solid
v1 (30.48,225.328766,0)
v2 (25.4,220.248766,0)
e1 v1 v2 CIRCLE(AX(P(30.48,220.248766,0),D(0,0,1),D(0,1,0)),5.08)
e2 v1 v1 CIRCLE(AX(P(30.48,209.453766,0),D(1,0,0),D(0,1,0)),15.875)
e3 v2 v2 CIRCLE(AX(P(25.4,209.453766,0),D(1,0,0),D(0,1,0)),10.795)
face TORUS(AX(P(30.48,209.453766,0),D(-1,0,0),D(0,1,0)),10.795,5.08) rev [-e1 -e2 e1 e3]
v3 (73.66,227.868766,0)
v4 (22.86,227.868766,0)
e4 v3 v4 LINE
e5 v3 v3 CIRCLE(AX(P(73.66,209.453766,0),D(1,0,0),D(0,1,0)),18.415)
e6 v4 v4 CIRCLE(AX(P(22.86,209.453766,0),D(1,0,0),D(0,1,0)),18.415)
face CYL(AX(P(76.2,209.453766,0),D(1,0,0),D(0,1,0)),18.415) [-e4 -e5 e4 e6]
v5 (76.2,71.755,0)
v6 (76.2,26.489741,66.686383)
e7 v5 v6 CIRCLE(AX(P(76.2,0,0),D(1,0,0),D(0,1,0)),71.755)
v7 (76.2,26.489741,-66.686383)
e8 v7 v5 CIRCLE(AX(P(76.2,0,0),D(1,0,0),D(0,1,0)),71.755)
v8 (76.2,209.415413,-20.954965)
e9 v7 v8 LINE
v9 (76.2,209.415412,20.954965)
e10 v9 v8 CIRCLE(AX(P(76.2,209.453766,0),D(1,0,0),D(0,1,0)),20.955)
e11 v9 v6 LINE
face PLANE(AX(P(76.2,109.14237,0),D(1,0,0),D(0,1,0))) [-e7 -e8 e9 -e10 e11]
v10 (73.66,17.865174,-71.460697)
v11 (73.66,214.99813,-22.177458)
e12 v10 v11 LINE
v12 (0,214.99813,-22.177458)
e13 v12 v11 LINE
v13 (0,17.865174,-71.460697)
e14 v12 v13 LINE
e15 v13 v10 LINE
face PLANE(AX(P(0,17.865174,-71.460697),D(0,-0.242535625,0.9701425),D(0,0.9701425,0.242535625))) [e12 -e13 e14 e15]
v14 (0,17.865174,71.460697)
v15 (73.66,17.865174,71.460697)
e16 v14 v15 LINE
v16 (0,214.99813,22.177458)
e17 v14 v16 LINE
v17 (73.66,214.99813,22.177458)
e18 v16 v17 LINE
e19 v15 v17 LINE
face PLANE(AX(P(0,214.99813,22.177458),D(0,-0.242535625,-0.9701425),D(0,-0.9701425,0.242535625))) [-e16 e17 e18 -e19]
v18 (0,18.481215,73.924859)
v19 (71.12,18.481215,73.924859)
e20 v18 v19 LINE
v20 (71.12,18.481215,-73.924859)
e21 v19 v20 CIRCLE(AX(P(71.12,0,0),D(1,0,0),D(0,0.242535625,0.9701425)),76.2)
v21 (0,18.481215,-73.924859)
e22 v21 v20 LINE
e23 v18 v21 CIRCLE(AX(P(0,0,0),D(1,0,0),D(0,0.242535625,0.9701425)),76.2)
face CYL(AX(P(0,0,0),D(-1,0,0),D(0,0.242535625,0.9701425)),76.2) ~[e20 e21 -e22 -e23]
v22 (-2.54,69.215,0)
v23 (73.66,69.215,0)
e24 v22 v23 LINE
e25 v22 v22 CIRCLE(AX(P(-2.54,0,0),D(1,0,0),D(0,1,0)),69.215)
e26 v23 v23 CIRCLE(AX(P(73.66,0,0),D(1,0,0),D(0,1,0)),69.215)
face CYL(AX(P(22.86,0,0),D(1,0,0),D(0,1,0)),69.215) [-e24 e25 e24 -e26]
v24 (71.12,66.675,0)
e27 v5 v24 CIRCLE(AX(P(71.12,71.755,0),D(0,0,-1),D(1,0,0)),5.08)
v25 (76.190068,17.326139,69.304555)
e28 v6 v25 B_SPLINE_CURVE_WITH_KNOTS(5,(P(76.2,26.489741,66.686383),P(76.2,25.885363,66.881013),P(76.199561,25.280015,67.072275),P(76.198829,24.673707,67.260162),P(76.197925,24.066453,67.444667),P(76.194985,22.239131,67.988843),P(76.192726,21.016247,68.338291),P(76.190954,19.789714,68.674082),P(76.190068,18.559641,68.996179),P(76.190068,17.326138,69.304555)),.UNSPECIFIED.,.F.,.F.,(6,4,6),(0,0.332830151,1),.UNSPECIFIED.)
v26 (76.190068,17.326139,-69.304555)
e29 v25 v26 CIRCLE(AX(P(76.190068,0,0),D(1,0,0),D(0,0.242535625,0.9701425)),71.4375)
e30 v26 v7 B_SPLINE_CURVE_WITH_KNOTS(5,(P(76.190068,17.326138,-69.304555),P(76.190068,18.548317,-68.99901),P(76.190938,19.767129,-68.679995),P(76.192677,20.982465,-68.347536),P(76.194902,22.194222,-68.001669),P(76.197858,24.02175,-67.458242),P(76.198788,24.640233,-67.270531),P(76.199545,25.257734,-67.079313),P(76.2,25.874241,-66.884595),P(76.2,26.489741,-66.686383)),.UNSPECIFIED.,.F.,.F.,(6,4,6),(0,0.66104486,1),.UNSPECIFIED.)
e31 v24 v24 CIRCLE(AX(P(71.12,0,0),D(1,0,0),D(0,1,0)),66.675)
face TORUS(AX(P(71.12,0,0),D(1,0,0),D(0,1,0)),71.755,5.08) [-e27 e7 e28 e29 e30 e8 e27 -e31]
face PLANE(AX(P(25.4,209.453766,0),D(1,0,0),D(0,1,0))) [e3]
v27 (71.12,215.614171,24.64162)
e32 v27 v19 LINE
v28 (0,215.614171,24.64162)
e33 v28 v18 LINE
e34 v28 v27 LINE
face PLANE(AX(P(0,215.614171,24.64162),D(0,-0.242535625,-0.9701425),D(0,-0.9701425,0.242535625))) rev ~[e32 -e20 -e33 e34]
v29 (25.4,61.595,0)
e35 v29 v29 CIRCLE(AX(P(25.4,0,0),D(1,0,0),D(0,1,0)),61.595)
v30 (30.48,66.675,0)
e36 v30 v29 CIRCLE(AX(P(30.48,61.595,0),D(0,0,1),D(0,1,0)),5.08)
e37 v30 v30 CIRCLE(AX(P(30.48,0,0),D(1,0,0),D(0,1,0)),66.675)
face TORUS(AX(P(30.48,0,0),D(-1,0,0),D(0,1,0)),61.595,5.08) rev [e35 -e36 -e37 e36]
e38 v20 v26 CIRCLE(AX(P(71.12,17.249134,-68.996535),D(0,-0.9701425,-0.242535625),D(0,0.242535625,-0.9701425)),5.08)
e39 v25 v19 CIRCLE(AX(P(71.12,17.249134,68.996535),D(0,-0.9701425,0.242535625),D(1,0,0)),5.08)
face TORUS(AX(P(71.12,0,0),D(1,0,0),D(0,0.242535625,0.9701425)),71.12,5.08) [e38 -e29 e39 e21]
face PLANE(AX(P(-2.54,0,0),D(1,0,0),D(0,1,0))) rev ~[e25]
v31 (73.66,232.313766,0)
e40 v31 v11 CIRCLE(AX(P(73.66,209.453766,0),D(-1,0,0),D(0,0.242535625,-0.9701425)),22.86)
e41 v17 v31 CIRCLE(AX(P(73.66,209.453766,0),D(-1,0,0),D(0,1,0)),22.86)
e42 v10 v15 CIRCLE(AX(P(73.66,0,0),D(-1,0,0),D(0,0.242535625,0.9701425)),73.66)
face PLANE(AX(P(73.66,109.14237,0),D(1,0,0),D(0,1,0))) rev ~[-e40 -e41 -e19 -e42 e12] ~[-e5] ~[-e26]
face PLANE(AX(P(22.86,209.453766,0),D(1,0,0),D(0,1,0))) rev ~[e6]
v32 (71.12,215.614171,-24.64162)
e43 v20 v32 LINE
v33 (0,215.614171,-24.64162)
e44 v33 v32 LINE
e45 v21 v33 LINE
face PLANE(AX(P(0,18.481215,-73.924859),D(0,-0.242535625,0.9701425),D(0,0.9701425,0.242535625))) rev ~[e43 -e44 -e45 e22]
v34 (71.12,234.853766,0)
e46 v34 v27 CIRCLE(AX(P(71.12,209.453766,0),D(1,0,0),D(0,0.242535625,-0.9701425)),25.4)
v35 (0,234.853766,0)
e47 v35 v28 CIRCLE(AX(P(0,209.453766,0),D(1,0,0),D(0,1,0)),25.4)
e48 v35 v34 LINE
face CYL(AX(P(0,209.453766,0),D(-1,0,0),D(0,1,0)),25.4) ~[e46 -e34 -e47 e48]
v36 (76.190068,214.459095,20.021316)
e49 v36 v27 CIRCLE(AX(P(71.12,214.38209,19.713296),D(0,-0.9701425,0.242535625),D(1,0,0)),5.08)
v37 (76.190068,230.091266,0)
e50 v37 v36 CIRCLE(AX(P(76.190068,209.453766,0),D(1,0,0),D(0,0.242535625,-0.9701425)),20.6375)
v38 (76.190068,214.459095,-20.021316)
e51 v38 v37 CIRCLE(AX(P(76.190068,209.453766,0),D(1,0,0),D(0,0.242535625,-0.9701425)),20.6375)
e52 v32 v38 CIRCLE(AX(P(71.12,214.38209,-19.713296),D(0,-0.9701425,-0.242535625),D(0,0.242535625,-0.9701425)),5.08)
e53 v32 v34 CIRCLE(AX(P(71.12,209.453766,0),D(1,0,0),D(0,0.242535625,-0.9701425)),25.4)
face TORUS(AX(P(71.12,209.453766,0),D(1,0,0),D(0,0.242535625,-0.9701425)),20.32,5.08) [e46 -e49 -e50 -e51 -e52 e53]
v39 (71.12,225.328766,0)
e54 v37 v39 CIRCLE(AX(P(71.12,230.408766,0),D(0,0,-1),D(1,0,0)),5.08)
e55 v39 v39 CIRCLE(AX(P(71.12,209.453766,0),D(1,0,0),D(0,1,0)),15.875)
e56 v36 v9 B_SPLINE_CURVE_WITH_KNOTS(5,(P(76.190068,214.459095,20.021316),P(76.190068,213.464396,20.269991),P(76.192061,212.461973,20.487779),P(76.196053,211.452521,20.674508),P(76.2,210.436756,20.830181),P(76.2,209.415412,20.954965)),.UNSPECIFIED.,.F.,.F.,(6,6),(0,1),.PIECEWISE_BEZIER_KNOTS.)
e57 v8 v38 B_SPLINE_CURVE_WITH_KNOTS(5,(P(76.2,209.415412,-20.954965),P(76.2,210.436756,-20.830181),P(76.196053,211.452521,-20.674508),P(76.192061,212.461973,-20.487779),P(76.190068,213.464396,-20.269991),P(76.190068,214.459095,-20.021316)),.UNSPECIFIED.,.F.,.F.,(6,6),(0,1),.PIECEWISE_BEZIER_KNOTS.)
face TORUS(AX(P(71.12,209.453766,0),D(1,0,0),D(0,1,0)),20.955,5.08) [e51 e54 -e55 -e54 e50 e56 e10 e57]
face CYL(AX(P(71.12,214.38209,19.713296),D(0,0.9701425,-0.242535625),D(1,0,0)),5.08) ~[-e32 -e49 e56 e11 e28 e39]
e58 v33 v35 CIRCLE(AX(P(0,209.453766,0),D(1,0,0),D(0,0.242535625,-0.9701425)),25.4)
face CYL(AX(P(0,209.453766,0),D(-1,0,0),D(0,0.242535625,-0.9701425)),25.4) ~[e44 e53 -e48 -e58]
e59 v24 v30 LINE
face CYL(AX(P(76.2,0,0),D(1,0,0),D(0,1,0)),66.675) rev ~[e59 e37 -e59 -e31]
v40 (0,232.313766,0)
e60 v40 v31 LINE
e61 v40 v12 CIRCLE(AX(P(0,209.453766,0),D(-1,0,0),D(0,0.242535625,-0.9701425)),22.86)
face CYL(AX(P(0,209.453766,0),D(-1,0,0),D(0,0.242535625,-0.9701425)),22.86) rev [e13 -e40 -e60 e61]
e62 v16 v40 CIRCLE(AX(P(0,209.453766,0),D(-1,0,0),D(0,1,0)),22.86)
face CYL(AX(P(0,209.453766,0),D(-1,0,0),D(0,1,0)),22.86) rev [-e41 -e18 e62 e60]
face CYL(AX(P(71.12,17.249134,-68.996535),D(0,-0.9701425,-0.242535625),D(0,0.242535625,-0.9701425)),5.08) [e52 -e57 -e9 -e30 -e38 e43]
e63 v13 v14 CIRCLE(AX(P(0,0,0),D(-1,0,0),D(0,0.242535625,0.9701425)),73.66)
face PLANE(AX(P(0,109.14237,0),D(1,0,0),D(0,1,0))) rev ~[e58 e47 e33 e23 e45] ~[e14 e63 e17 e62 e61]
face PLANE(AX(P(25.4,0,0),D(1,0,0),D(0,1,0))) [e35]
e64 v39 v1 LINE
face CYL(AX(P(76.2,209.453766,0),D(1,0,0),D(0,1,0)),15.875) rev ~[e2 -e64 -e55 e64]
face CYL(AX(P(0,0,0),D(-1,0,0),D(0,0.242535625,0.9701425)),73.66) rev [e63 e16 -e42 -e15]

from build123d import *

# Parameters (mm, degrees)
F1_DEPTH    = 76.2
F2_R        = 66.675
F3_DEPTH    = 50.8
F2_R_2      = 15.875
F4_DEPTH    = 50.8
F5_T        = -2.54
F6_T1_DEPTH = 203.2
F6_T3_DEPTH = 203.2
F6_T6_ANGLE = 208.0724869359
F6_T8_ANGLE = 151.9275130641
F7_R        = 5.08
F8_DEPTH    = 25.4


# Not quite as in the source:
# - a fillet or chamfer that OpenCascade refuses, or shapes differently, is made with other operations: its cross-section is extruded or revolved along the edge and cut away or added


with BuildPart() as f1:
    # F0 (on Right) → F1 (new body)
    with BuildSketch(Plane.YZ):
        with BuildLine():
            ThreePointArc((18.4812146278, 73.9248585111), (60.0612543768, 46.8944103565), (76.2, 0))
            ThreePointArc((76.2, 0), (60.0612543768, -46.8944103565), (18.4812146278, -73.9248585111))
            Line((18.4812146278, -73.9248585111), (215.6141706573, -24.6416195037))
            ThreePointArc((215.6141706573, -24.6416195037), (184.0537657814, 0), (215.6141706573, 24.6416195037))
            Line((215.6141706573, 24.6416195037), (18.4812146278, 73.9248585111))
        make_face()
        with BuildLine():
            ThreePointArc((18.4812146278, -73.9248585111), (60.0612543768, -46.8944103565), (76.2, 0))
            ThreePointArc((76.2, 0), (60.0612543768, 46.8944103565), (18.4812146278, 73.9248585111))
            ThreePointArc((18.4812146278, 73.9248585111), (-76.2, 0), (18.4812146278, -73.9248585111))
        make_face()
        with BuildLine():
            ThreePointArc((234.8537657814, 0), (229.474183907, 15.6314701188), (215.6141706573, 24.6416195037))
            ThreePointArc((215.6141706573, 24.6416195037), (184.0537657814, 0), (215.6141706573, -24.6416195037))
            ThreePointArc((215.6141706573, -24.6416195037), (229.474183907, -15.6314701188), (234.8537657814, 0))
        make_face()
    extrude(amount=F1_DEPTH)

    # F2 (on face) → F3 (cut)
    with BuildSketch(Plane.YZ.offset(76.2)):
        Circle(F2_R)
    extrude(amount=-F3_DEPTH, mode=Mode.SUBTRACT)

    # F2 (on face) → F4 (cut)
    with BuildSketch(Plane.YZ.offset(76.2)):
        with Locations((209.4537657814, 0)):
            Circle(F2_R_2)
    extrude(amount=-F4_DEPTH, mode=Mode.SUBTRACT)

    # F5
    f5_openings = [f1.faces().sort_by_distance(p)[0] for p in [
        (0, 57.51924, 0),
    ]]
    offset(amount=F5_T, openings=f5_openings, kind=Kind.INTERSECTION)

    # F6: fillet of radius 5.08 on 6 edges, made by hand

    # F6_s2 → F6_t1 (cut)
    with BuildSketch(Plane(origin=(0, 0, 0), x_dir=(1, 0, 0), z_dir=(0, 0.9701425001, 0.242535625))):
        with BuildLine():
            ThreePointArc((71.12, 76.2), (74.7121024484, 74.7121024484), (76.2, 71.12))
            Line((76.2, 71.12), (76.2, 76.2))
            Line((76.2, 76.2), (71.12, 76.2))
        make_face()
    extrude(amount=F6_T1_DEPTH, mode=Mode.SUBTRACT)

    # F6_s4 → F6_t3 (cut)
    with BuildSketch(Plane(origin=(0, 197.1329560295, -49.2832390074), x_dir=(1, 0, 0), z_dir=(0, -0.9701425001, 0.242535625))):
        with BuildLine():
            ThreePointArc((76.2, 71.12), (74.7121024484, 74.7121024484), (71.12, 76.2))
            Line((71.12, 76.2), (76.2, 76.2))
            Line((76.2, 76.2), (76.2, 71.12))
        make_face()
    extrude(amount=F6_T3_DEPTH, mode=Mode.SUBTRACT)

    # F6_s5 → F6_t6 (revolve, cut)
    with BuildSketch(Plane(origin=(0, 0, 0), x_dir=(1, 0, 0), z_dir=(0, 0.9701425001, -0.242535625))):
        with BuildLine():
            ThreePointArc((71.12, -76.2), (74.7121024484, -74.7121024484), (76.2, -71.12))
            Line((76.2, -71.12), (76.2, -76.2))
            Line((76.2, -76.2), (71.12, -76.2))
        make_face()
    revolve(axis=Axis((76.2, 0, 0), (1, 0, 0)), revolution_arc=F6_T6_ANGLE, mode=Mode.SUBTRACT)

    # F6_s7 → F6_t8 (revolve, cut)
    with BuildSketch(Plane(origin=(0, 197.1329560295, 49.2832390074), x_dir=(1, 0, 0), z_dir=(0, -0.9701425001, -0.242535625))):
        with BuildLine():
            ThreePointArc((71.12, -76.2), (74.7121024484, -74.7121024484), (76.2, -71.12))
            Line((76.2, -71.12), (76.2, -76.2))
            Line((76.2, -76.2), (71.12, -76.2))
        make_face()
    revolve(axis=Axis((76.2, 209.4537657814, 0), (1, 0, 0)), revolution_arc=F6_T8_ANGLE, mode=Mode.SUBTRACT)

    # F6_s9 → F6_t10 (revolve, cut)
    with BuildSketch(Plane.XY):
        with BuildLine():
            ThreePointArc((76.2, 71.755), (74.7121024484, 68.1628975516), (71.12, 66.675))
            Line((71.12, 66.675), (76.2, 66.675))
            Line((76.2, 66.675), (76.2, 71.755))
        make_face()
    revolve(axis=Axis((76.2, 0, 0), (1, 0, 0)), mode=Mode.SUBTRACT)

    # F6_s11 → F6_t12 (revolve, cut)
    with BuildSketch(Plane.XY):
        with BuildLine():
            ThreePointArc((76.2, 230.4087657814), (74.7121024484, 226.8166633329), (71.12, 225.3287657814))
            Line((71.12, 225.3287657814), (76.2, 225.3287657814))
            Line((76.2, 225.3287657814), (76.2, 230.4087657814))
        make_face()
    revolve(axis=Axis((76.2, 209.4537657814, 0), (1, 0, 0)), mode=Mode.SUBTRACT)

    # F7
    f7_edges = [f1.edges().sort_by_distance(p)[0] for p in [
        (25.4, -66.675, 0),
        (25.4, 193.578766, 0),
    ]]
    fillet(f7_edges, radius=F7_R)

    # F8 (add): a face of the model
    f8_faces = [f1.faces().sort_by_distance(p)[0] for p in [
        (22.86, 0, 0),
    ]]
    extrude(f8_faces, amount=F8_DEPTH)


solid = f1.part
